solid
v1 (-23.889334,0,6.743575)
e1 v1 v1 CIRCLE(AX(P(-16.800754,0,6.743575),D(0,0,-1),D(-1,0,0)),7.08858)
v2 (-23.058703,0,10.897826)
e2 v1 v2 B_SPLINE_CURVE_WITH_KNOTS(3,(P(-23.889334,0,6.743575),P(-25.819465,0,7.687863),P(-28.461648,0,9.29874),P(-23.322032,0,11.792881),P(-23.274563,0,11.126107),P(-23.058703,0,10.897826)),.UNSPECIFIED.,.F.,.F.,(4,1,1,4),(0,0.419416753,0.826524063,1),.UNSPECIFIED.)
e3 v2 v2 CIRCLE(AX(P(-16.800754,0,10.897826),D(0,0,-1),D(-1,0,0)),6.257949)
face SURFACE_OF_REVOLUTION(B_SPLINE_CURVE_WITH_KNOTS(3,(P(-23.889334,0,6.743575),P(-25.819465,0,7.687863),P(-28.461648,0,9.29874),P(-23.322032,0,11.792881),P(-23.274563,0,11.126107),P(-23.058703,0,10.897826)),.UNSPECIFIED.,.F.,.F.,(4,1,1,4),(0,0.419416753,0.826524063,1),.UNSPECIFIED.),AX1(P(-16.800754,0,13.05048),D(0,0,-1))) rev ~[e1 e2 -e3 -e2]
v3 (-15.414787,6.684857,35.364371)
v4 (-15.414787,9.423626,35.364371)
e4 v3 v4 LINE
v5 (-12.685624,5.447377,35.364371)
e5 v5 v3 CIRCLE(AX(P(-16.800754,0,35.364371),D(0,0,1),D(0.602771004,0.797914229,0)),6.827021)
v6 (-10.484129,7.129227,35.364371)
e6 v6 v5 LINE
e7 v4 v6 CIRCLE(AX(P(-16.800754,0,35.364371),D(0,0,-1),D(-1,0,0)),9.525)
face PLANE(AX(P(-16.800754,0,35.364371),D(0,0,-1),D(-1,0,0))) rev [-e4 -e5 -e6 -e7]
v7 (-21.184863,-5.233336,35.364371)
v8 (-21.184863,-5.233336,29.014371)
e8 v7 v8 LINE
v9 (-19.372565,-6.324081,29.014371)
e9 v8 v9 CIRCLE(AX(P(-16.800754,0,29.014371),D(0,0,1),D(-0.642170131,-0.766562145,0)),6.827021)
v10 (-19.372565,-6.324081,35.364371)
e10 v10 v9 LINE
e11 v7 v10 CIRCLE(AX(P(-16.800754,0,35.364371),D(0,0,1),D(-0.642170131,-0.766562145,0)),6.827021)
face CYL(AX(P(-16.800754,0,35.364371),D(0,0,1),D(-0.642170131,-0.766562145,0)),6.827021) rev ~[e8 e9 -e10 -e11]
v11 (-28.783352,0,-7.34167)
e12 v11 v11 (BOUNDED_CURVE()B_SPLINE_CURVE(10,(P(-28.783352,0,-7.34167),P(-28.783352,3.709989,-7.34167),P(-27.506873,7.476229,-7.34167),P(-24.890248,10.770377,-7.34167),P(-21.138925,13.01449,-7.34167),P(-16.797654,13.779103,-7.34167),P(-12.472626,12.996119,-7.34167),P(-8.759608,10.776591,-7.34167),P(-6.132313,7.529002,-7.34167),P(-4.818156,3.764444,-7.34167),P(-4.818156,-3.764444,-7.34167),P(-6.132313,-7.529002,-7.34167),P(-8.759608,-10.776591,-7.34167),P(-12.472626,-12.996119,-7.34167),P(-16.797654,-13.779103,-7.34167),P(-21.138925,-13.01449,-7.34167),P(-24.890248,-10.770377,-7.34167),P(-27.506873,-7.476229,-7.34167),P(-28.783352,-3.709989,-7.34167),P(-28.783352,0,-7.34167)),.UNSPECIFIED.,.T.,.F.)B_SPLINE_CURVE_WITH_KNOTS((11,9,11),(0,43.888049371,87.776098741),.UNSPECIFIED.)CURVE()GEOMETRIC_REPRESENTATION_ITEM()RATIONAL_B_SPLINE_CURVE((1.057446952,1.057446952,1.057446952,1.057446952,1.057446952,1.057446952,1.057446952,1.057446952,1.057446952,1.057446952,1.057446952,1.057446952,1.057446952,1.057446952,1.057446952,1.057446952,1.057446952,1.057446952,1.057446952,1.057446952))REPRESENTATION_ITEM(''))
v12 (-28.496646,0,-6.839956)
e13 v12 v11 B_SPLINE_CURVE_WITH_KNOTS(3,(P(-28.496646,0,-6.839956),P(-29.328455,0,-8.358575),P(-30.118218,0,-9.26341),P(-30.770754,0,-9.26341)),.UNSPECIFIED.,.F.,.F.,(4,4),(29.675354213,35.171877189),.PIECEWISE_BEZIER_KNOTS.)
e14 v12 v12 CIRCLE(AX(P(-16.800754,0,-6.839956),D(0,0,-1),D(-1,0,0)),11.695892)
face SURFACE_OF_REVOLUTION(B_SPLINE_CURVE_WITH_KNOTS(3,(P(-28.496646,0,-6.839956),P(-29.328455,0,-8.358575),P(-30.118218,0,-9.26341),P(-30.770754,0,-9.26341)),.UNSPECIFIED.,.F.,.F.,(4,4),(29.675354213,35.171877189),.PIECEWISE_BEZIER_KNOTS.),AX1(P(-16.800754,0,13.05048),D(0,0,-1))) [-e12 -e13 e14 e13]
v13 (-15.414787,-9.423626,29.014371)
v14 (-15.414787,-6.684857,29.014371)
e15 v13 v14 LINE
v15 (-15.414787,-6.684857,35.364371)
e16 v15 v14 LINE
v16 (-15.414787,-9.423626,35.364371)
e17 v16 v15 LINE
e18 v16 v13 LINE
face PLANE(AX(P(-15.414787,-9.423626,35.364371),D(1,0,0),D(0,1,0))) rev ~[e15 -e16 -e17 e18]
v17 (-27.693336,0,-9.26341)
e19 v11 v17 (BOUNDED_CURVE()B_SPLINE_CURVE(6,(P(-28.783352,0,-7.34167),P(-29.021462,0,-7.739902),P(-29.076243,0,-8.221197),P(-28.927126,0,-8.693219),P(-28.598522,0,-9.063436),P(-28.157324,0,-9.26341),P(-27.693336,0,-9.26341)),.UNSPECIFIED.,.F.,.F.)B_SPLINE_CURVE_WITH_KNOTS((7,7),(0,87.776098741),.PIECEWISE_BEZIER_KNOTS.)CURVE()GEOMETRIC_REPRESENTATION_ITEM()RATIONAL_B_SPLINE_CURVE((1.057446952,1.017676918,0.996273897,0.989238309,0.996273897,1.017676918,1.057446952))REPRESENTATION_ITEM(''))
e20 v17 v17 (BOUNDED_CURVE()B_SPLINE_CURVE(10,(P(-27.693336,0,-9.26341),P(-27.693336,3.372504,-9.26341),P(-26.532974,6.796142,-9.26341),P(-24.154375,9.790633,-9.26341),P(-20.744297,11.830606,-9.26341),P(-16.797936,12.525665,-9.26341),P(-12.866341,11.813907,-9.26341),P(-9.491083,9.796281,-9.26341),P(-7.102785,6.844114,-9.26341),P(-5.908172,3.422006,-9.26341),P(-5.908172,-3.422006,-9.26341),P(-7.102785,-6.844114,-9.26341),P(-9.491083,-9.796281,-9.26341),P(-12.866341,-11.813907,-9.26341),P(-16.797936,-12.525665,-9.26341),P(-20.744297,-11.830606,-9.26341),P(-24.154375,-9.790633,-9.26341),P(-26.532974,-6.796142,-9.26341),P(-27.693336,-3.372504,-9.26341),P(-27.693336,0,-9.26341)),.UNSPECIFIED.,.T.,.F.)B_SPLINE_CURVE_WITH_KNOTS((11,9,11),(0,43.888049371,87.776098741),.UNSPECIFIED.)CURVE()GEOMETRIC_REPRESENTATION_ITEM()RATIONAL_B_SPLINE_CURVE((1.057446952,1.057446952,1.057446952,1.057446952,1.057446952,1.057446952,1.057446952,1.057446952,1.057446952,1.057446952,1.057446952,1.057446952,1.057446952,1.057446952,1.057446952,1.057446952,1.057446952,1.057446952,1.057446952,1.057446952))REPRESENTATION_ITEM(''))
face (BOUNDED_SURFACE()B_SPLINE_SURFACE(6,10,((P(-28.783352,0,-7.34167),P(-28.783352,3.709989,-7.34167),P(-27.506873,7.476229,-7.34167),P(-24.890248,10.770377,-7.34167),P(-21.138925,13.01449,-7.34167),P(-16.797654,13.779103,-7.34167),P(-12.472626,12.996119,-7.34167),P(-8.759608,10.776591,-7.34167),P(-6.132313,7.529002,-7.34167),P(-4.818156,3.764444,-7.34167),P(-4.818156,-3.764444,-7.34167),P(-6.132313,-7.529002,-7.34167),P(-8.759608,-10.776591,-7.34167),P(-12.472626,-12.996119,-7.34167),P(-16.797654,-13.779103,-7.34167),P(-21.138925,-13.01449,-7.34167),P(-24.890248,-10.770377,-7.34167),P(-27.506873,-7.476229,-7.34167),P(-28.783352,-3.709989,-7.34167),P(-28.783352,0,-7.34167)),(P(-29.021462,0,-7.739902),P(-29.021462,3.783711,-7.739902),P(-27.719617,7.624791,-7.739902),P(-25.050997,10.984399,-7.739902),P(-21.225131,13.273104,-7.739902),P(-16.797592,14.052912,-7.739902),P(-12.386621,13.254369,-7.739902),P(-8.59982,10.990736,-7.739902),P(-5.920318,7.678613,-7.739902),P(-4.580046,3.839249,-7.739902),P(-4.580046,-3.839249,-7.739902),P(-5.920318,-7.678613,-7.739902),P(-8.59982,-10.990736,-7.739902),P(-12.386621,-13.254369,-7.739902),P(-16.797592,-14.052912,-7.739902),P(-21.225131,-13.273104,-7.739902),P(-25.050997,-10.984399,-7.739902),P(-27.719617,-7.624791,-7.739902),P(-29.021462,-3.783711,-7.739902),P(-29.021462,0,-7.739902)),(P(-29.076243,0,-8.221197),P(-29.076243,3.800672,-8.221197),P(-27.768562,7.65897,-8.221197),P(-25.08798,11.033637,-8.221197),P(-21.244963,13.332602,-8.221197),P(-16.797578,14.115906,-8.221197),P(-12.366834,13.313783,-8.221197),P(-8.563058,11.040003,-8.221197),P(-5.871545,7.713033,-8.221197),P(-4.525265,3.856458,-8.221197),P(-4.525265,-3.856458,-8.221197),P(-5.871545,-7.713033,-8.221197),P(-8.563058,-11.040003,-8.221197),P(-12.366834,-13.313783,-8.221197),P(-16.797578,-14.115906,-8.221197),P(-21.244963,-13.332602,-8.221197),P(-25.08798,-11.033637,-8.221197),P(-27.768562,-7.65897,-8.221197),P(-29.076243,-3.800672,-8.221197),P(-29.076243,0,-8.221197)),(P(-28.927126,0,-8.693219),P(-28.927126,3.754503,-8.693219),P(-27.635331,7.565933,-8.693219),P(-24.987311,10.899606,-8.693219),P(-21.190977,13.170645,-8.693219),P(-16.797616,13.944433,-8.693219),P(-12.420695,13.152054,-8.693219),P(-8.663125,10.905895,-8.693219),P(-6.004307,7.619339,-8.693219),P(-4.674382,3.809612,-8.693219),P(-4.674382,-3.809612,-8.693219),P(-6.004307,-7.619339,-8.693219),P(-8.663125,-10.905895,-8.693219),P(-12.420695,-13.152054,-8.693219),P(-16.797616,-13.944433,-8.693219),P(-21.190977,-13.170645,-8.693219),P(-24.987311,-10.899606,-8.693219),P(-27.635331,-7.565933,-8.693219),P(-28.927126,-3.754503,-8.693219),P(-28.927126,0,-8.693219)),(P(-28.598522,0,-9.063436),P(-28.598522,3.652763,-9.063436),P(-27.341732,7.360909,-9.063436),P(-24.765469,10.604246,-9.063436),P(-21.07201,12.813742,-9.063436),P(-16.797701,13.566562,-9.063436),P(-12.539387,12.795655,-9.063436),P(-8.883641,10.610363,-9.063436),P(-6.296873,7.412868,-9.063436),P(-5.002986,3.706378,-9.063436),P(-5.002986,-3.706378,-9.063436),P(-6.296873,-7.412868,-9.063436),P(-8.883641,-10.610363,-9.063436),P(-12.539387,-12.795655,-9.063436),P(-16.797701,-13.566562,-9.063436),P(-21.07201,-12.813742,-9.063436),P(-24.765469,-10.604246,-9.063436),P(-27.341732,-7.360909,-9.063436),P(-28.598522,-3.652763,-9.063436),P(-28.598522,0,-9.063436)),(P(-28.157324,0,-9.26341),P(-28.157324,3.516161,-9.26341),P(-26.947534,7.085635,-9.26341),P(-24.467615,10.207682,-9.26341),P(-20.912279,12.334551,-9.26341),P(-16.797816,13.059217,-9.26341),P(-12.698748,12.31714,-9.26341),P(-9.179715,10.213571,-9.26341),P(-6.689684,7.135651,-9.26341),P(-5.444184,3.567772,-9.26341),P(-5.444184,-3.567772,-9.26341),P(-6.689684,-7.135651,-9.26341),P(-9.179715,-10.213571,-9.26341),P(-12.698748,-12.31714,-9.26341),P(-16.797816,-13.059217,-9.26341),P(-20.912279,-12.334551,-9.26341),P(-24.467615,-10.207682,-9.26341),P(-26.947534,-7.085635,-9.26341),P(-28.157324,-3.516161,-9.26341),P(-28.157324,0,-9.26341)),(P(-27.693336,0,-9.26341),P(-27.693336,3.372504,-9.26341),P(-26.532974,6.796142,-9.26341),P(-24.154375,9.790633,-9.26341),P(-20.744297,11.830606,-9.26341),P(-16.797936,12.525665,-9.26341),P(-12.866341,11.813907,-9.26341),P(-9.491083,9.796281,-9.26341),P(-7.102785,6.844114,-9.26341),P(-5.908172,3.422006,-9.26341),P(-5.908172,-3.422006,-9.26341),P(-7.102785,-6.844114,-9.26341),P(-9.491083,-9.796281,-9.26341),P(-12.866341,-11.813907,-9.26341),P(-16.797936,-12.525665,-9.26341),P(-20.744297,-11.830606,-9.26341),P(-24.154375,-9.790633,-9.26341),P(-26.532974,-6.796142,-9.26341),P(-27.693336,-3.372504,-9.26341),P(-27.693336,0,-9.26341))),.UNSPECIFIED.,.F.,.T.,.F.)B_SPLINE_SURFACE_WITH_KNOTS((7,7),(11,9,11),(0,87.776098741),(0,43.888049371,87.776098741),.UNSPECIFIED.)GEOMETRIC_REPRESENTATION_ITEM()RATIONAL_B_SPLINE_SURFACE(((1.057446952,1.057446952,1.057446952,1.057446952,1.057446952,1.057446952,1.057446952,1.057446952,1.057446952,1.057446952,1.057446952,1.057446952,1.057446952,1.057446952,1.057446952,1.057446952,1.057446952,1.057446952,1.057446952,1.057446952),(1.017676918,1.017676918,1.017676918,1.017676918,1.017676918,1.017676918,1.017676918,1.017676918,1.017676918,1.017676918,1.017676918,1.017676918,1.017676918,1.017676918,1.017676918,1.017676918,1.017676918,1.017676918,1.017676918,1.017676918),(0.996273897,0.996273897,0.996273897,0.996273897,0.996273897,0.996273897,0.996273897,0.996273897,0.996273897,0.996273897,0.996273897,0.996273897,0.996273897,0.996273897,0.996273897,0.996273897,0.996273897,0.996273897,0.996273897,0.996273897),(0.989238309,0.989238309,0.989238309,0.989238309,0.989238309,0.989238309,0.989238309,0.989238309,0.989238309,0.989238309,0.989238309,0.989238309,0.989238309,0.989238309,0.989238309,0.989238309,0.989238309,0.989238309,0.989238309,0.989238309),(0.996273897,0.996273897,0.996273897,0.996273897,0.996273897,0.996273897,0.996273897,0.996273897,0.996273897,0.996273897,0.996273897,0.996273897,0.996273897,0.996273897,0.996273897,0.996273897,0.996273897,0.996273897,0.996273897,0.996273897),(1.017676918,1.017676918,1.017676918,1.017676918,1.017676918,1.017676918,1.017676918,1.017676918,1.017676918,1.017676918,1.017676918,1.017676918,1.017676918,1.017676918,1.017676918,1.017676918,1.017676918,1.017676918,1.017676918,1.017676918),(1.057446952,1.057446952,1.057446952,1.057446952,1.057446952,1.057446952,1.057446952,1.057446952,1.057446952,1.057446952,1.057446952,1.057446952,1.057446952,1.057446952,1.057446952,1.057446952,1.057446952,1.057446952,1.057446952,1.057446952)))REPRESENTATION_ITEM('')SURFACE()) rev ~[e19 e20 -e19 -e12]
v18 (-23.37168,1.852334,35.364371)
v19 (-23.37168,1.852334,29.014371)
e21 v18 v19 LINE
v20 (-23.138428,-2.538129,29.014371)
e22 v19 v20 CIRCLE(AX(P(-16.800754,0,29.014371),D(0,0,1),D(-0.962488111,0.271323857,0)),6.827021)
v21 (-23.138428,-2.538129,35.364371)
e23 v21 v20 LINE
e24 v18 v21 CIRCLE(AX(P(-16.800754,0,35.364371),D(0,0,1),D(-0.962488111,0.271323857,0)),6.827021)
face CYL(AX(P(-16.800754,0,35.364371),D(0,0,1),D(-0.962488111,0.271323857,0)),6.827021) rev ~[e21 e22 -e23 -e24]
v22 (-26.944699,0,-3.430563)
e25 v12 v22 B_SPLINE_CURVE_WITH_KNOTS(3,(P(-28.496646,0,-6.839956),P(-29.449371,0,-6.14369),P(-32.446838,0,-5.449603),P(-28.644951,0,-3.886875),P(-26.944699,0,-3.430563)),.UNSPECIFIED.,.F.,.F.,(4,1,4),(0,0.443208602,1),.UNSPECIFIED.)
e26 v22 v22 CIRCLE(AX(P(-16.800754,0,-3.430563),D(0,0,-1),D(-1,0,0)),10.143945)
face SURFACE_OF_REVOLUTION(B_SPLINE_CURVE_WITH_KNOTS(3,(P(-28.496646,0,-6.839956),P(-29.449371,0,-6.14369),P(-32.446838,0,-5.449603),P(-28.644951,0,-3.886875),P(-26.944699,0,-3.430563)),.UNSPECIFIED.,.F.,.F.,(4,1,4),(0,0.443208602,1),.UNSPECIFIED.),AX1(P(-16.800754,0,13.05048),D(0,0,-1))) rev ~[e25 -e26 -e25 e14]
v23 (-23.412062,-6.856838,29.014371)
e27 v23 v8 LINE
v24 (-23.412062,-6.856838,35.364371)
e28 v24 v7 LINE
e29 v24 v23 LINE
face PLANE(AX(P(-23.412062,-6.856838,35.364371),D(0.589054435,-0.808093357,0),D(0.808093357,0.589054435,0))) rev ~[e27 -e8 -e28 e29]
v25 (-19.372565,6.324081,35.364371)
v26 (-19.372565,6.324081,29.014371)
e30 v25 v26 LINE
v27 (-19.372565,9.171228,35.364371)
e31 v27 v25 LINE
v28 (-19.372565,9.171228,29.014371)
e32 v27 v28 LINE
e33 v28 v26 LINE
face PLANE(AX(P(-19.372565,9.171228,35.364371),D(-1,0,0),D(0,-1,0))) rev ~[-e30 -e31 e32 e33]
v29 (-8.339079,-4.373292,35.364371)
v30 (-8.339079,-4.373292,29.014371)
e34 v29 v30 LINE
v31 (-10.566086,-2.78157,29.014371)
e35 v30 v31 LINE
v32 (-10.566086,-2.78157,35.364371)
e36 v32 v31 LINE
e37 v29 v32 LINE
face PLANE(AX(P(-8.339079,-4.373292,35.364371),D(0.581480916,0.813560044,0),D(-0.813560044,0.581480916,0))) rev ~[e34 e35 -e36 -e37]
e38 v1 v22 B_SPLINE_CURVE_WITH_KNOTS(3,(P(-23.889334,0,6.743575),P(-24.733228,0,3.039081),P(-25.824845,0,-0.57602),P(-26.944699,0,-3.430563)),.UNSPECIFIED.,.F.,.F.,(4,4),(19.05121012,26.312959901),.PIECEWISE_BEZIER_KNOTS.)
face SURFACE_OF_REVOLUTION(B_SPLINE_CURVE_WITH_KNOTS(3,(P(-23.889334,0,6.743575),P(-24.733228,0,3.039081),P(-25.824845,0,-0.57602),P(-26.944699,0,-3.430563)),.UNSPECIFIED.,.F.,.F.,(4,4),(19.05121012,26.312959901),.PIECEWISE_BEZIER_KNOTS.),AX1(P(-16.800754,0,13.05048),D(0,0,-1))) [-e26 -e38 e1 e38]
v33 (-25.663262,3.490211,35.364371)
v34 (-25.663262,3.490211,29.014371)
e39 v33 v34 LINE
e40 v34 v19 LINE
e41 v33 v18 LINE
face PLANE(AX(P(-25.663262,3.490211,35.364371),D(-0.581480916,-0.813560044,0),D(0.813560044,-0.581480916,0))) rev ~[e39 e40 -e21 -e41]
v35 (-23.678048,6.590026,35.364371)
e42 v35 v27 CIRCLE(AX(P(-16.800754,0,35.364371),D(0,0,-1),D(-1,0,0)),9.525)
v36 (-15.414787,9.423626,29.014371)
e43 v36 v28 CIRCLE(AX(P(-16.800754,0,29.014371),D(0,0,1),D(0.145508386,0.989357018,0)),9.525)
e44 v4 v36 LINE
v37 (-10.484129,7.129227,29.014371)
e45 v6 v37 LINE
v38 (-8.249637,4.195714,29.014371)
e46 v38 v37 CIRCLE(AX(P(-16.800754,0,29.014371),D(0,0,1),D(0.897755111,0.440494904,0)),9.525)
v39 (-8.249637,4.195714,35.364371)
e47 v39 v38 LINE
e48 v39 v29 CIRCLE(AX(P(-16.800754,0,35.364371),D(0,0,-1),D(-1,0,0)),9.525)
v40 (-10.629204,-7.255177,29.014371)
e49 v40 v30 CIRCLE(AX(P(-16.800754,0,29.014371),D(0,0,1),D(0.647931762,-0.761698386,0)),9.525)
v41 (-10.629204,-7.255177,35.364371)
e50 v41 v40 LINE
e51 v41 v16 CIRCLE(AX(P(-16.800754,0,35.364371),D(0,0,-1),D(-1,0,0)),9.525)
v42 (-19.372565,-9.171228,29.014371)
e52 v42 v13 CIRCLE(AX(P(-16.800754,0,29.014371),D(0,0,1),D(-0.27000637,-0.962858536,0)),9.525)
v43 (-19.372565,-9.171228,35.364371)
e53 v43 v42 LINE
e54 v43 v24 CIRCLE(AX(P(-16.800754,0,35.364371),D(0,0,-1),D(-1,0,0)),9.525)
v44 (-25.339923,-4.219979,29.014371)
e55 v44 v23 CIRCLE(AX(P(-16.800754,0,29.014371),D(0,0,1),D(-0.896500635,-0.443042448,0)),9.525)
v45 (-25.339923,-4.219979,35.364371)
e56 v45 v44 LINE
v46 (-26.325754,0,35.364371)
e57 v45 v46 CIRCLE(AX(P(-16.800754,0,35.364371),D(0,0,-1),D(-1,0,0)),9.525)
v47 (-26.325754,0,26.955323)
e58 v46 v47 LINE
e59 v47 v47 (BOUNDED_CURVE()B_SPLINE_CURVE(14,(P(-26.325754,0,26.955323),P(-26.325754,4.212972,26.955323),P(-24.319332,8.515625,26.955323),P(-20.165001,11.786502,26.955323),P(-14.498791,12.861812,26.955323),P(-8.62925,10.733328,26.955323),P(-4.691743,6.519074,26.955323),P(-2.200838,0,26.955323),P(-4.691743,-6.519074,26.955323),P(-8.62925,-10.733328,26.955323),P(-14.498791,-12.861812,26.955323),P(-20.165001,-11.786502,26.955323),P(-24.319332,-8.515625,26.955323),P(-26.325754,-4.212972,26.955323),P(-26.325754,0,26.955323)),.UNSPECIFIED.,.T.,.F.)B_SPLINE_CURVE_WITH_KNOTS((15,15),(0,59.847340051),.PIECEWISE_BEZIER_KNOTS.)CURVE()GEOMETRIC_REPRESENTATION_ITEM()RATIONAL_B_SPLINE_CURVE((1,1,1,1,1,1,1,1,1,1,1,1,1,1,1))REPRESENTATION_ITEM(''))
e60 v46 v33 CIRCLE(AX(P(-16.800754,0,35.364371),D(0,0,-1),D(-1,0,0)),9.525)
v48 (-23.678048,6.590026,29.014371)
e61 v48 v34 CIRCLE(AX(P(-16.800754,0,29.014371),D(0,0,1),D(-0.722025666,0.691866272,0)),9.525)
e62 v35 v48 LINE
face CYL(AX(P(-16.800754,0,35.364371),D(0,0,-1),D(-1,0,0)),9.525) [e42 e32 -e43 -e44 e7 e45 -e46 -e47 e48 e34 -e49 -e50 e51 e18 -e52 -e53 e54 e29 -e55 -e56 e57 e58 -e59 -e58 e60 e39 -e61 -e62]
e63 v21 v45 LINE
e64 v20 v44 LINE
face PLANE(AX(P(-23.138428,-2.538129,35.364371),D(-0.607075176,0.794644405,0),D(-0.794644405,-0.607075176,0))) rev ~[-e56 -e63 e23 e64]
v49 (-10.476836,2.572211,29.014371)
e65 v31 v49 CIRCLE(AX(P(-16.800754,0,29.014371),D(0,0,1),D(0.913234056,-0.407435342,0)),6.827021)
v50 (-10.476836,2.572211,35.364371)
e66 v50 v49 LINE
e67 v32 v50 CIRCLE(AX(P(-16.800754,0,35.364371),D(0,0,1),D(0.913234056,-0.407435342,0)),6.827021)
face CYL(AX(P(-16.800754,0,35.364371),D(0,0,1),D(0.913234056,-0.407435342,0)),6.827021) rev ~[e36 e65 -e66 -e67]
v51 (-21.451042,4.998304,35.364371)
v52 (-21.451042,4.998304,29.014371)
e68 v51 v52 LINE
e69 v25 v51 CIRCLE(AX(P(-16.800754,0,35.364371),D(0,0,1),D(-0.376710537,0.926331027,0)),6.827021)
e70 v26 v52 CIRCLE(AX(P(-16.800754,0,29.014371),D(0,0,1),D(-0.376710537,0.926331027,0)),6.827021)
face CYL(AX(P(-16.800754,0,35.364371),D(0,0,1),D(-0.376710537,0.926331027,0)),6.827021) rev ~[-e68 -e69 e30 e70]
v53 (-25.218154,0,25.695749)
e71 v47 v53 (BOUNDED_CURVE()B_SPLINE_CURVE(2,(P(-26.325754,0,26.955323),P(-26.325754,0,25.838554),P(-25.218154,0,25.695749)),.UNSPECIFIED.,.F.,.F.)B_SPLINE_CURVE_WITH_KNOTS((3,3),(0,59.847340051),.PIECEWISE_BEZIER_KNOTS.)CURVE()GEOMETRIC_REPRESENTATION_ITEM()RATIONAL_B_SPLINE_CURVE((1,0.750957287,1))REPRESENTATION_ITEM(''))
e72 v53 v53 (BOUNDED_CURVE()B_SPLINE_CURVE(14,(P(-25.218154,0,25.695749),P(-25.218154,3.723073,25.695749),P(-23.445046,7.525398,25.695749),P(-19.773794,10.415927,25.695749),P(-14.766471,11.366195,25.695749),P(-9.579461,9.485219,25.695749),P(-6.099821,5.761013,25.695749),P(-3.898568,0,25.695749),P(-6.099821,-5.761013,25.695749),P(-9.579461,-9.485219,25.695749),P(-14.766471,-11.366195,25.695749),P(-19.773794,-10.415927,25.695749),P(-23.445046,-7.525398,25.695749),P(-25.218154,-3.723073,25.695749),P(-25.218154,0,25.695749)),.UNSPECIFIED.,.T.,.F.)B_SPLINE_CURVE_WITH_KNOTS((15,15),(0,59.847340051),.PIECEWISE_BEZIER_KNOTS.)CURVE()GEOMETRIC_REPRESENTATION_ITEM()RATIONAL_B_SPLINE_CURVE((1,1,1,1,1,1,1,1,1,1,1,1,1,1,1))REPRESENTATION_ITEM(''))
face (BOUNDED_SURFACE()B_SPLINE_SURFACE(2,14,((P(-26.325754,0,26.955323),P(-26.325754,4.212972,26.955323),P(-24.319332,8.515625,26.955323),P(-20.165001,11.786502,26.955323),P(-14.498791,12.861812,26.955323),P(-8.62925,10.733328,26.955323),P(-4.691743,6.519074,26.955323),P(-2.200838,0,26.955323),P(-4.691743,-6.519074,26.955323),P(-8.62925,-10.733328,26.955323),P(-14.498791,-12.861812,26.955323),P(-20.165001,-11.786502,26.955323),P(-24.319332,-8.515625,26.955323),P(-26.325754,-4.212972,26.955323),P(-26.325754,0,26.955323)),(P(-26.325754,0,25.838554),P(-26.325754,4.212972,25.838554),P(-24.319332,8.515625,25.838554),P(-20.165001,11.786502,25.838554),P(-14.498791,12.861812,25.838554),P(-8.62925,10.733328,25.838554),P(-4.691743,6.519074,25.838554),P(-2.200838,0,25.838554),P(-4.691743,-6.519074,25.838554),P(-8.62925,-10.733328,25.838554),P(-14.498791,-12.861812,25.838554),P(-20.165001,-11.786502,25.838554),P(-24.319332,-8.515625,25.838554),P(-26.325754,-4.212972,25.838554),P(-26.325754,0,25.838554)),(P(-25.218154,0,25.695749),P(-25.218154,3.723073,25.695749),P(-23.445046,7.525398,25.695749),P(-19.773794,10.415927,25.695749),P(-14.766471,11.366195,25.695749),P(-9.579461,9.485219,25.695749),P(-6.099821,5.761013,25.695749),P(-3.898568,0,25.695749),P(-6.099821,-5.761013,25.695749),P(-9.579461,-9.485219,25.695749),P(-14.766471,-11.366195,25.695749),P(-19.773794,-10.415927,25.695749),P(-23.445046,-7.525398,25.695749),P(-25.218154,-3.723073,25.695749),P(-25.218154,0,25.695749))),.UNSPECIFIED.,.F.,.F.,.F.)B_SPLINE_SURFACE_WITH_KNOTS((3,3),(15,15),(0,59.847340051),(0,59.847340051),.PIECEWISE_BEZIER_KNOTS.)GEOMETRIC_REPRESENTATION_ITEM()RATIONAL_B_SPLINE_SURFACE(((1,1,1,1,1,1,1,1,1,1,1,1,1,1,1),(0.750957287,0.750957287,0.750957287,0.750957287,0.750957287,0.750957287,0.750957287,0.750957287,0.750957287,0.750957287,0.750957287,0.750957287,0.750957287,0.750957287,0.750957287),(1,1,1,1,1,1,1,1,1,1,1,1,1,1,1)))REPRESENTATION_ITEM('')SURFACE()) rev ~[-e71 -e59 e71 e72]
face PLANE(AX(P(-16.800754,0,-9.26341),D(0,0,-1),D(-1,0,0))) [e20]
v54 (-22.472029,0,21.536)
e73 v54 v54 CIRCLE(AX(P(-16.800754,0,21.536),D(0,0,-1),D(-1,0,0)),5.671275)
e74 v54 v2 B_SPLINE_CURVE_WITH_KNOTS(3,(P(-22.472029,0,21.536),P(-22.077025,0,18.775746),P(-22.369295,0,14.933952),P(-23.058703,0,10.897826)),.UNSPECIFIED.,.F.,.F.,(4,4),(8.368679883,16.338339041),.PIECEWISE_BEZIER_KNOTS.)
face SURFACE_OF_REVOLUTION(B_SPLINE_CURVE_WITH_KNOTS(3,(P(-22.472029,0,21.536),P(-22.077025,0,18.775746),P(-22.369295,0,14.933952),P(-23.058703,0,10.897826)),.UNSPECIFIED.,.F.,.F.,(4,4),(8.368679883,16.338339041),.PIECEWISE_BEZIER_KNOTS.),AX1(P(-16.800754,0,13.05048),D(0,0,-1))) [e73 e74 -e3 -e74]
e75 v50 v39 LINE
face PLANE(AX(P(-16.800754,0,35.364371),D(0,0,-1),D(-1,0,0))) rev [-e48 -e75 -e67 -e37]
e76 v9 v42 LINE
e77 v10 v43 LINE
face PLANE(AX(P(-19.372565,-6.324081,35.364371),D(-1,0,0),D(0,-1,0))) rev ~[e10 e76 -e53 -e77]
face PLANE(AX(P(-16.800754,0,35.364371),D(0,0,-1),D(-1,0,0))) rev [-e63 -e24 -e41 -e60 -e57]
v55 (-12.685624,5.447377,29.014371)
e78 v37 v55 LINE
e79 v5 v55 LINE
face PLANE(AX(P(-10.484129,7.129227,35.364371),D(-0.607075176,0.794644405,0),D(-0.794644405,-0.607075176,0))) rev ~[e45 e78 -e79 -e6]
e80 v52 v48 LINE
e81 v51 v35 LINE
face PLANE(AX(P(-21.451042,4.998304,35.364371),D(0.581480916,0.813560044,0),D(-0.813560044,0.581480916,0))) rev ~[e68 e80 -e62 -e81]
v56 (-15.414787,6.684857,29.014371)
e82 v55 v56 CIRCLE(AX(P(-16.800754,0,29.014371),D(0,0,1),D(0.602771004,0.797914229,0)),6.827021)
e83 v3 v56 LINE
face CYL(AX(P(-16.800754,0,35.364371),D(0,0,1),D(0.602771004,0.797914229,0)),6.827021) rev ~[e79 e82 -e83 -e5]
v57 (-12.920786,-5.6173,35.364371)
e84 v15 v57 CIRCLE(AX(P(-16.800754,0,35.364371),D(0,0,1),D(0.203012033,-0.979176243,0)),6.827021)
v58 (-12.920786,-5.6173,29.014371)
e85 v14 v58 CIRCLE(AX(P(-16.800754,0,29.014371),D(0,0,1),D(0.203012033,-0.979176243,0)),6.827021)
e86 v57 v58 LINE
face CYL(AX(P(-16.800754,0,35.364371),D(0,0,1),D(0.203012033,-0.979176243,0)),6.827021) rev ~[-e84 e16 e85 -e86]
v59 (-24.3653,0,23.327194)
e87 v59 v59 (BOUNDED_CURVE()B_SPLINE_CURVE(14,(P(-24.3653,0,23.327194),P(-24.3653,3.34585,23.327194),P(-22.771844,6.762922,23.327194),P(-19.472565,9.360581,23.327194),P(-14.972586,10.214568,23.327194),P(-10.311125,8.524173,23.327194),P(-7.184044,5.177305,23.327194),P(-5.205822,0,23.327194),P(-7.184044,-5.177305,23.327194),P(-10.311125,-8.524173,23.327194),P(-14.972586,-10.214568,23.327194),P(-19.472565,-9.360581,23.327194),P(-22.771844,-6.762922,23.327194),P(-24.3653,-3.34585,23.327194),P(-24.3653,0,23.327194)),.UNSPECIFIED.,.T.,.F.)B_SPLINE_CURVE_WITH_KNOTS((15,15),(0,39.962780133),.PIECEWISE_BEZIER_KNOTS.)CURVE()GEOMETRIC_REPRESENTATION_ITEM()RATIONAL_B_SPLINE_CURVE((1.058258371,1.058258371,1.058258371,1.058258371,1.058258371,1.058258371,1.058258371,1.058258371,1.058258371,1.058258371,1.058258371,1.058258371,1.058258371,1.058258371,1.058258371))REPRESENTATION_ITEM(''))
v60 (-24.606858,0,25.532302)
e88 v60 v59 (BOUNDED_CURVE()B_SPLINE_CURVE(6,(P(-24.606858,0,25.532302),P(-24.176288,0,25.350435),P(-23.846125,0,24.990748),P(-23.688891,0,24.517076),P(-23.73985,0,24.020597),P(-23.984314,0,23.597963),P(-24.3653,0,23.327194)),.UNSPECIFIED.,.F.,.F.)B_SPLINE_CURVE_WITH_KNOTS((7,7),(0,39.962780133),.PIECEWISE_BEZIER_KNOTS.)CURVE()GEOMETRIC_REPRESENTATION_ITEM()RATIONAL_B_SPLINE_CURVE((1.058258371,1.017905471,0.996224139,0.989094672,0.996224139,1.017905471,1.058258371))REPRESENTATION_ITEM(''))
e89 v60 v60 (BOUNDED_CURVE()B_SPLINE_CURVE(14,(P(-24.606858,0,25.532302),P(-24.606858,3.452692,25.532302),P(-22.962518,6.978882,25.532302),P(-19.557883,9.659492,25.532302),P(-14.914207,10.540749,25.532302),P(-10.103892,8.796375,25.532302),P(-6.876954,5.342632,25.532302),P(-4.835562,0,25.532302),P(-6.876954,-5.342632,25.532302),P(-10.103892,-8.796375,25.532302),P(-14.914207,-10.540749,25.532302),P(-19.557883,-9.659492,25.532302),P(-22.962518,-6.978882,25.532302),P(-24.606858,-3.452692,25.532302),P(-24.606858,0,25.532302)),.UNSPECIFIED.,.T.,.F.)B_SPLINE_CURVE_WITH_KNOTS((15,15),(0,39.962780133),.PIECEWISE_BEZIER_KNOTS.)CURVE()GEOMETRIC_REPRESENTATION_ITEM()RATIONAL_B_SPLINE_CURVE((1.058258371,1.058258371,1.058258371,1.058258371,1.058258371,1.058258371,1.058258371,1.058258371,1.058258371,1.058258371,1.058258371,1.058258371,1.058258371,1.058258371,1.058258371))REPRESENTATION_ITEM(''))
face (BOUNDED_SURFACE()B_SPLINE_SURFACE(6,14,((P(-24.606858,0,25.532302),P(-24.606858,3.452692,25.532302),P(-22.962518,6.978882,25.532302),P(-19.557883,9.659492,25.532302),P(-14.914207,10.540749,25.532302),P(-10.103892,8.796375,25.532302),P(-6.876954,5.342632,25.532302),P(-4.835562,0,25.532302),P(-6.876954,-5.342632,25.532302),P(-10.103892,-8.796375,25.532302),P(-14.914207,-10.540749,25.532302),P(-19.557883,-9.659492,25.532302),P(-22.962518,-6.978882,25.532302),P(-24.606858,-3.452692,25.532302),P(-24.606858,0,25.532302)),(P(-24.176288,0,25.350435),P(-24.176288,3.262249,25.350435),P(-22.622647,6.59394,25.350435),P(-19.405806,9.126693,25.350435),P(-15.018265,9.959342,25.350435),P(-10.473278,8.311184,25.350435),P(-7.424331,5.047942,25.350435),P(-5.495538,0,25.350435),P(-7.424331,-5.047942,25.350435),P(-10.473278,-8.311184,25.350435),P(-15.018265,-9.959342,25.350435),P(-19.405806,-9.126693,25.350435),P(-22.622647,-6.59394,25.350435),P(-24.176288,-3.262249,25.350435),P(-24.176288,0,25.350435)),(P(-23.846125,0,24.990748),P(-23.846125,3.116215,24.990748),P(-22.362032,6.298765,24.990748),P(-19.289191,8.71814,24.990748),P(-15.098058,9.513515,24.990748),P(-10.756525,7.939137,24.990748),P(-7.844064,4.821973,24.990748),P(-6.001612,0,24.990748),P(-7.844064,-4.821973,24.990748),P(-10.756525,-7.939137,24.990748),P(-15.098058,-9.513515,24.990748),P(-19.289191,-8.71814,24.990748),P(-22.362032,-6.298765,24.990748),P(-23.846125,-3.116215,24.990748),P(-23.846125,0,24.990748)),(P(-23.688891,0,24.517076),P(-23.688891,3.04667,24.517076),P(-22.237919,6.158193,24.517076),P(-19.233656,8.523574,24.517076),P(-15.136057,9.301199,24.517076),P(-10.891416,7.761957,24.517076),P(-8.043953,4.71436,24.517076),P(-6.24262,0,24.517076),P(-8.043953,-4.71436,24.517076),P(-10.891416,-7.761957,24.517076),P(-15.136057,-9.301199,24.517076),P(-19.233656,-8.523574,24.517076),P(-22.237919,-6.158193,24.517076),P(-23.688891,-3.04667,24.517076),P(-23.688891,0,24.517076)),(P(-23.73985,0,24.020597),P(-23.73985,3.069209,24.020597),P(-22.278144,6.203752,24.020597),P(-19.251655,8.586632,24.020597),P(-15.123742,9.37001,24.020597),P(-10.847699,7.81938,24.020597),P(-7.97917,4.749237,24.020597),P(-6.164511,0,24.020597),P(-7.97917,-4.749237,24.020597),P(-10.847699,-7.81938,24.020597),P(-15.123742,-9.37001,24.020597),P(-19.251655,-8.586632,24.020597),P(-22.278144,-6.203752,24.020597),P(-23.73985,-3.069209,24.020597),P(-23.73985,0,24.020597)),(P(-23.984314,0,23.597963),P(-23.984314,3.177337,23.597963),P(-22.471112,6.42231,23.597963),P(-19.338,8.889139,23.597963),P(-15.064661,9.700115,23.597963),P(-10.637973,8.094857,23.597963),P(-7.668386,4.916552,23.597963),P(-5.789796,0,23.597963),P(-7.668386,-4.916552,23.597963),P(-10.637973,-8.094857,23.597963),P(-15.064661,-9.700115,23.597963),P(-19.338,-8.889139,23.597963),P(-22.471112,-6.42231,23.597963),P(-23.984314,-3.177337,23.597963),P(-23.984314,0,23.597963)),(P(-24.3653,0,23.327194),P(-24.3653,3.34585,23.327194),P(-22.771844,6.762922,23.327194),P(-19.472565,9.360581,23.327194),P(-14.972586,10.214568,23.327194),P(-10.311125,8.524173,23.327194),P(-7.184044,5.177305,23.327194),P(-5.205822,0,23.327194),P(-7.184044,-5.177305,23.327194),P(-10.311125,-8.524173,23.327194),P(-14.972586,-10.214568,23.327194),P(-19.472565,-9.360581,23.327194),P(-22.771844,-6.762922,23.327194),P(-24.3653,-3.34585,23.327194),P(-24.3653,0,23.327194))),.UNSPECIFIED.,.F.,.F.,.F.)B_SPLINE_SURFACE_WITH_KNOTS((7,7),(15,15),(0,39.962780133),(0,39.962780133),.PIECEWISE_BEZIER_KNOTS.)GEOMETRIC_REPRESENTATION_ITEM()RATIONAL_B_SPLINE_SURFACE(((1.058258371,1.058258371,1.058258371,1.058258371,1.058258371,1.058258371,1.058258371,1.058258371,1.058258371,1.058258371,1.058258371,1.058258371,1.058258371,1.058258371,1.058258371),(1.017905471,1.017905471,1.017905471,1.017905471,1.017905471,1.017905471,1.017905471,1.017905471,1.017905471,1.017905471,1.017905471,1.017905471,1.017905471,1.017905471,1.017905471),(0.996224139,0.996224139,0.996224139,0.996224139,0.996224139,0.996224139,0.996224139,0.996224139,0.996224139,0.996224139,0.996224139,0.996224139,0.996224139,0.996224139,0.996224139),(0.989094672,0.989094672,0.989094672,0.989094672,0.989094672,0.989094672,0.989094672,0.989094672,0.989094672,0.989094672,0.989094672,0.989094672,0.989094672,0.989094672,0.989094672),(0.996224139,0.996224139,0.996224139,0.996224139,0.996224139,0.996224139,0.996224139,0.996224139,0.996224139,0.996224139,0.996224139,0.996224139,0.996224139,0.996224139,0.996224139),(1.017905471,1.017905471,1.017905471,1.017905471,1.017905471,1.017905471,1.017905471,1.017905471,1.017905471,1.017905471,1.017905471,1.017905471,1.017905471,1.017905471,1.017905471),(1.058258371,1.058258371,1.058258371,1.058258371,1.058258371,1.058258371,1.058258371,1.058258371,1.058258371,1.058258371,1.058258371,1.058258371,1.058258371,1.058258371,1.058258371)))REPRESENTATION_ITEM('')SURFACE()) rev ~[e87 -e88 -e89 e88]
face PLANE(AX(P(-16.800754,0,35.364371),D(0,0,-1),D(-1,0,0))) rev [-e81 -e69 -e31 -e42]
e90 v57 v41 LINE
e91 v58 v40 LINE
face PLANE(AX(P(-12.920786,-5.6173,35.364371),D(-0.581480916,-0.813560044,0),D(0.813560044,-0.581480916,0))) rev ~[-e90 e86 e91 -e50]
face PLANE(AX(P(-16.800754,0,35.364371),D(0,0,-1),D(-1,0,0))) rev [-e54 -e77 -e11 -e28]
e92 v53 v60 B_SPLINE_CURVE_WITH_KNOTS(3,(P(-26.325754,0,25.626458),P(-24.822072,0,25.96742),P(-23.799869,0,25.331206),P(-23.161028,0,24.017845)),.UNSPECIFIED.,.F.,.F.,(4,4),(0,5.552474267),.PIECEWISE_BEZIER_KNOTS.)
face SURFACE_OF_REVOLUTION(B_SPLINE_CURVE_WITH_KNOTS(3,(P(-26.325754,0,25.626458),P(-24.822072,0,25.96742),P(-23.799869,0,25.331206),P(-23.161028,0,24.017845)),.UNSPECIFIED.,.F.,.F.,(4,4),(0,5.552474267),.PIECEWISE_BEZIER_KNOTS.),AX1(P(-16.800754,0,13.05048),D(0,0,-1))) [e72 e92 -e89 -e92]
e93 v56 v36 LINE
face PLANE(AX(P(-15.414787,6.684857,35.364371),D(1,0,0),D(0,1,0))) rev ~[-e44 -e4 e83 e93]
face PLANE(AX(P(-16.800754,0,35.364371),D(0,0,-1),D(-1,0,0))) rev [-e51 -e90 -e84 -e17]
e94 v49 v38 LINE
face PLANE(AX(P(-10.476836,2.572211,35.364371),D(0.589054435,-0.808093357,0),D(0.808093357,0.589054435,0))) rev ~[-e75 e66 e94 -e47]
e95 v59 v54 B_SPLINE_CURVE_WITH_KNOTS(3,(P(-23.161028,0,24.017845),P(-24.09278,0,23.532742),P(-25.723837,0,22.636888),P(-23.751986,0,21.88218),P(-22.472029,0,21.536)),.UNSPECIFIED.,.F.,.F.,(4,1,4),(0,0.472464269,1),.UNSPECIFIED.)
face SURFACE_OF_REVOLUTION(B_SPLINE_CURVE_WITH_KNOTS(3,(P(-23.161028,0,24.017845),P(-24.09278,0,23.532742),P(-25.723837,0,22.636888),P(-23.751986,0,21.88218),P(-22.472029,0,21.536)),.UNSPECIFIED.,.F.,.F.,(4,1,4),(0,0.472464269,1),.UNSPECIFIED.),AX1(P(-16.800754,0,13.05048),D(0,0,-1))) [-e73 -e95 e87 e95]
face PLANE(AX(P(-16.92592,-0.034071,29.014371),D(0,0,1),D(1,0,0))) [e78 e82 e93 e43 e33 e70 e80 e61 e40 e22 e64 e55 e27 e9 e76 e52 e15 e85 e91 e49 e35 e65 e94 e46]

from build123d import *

# Parameters (mm, degrees)
F2_R     = 1.27
F4_DEPTH = 6.35


with BuildPart() as f1:
    # F0 (on Front) → F1 (revolve)
    with BuildSketch(Plane.XZ):
        with BuildLine():
            add(Edge.make_bspline(
                [(-28.4966456652, -6.8399562779), (-29.3284551449, -8.3585751384), (-30.1182179448, -9.2634102158), (-30.770753986, -9.2634102158)],
                knots=[29.675354213, 29.675354213, 29.675354213, 29.675354213, 35.171877189, 35.171877189, 35.171877189, 35.171877189], degree=3))
            Line((-30.770753986, -9.2634102158), (-16.800753986, -9.2634102158))
            Line((-16.800753986, -9.2634102158), (-16.800753986, 35.3643707931))
            Line((-16.800753986, 35.3643707931), (-26.325753986, 35.3643707931))
            Line((-26.325753986, 35.3643707931), (-26.325753986, 25.6264582276))
            add(Edge.make_bspline(
                [(-26.325753986, 25.6264582276), (-24.8220720213, 25.9674204899), (-23.7998688188, 25.3312059181), (-23.1610279839, 24.0178447701)],
                knots=[0, 0, 0, 0, 5.552474267, 5.552474267, 5.552474267, 5.552474267], degree=3))
            add(Edge.make_bspline(
                [(-23.1610279839, 24.0178447701), (-22.8370089862, 23.3517102033), (-22.6116100093, 22.5113795883), (-22.4720291366, 21.535999924)],
                knots=[5.552474267, 5.552474267, 5.552474267, 5.552474267, 8.3686798828, 8.3686798828, 8.3686798828, 8.3686798828], degree=3))
            add(Edge.make_bspline(
                [(-22.4720291366, 21.535999924), (-22.0770253148, 18.7757456898), (-22.3692951404, 14.9339521497), (-23.0587029188, 10.8978256431)],
                knots=[8.3686798828, 8.3686798828, 8.3686798828, 8.3686798828, 16.3383390414, 16.3383390414, 16.3383390414, 16.3383390414], degree=3))
            add(Edge.make_bspline(
                [(-23.0587029188, 10.8978256431), (-23.2933772487, 9.5239286357), (-23.5740687806, 8.1275138626), (-23.8893337374, 6.7435752652)],
                knots=[16.3383390414, 16.3383390414, 16.3383390414, 16.3383390414, 19.0512101196, 19.0512101196, 19.0512101196, 19.0512101196], degree=3))
            add(Edge.make_bspline(
                [(-23.8893337374, 6.7435752652), (-24.7332275919, 3.0390808319), (-25.8248446305, -0.5760201452), (-26.9446993916, -3.4305627711)],
                knots=[19.0512101196, 19.0512101196, 19.0512101196, 19.0512101196, 26.312959901, 26.312959901, 26.312959901, 26.312959901], degree=3))
            add(Edge.make_bspline(
                [(-26.9446993916, -3.4305627711), (-27.4632236305, -4.752296262), (-27.9878018969, -5.9109698185), (-28.4966456652, -6.8399562779)],
                knots=[26.312959901, 26.312959901, 26.312959901, 26.312959901, 29.675354213, 29.675354213, 29.675354213, 29.675354213], degree=3))
        make_face()
        with BuildLine():
            add(Edge.make_bspline(
                [(-28.4966456652, -6.8399562779), (-29.4493708837, -6.1436897859), (-32.4468383476, -5.4496032834), (-28.6449505836, -3.8868749556), (-26.9446993916, -3.4305627711)],
                knots=[0, 0, 0, 0, 0.4432086015, 1, 1, 1, 1], degree=3))
            add(Edge.make_bspline(
                [(-26.9446993916, -3.4305627711), (-27.4632236305, -4.752296262), (-27.9878018969, -5.9109698185), (-28.4966456652, -6.8399562779)],
                knots=[26.312959901, 26.312959901, 26.312959901, 26.312959901, 29.675354213, 29.675354213, 29.675354213, 29.675354213], degree=3))
        make_face()
        with BuildLine():
            add(Edge.make_bspline(
                [(-23.8893337374, 6.7435752652), (-25.8194649176, 7.6878634155), (-28.4616478332, 9.2987396297), (-23.3220318401, 11.7928811589), (-23.2745634428, 11.1261067843), (-23.0587029188, 10.8978256431)],
                knots=[0, 0, 0, 0, 0.4194167532, 0.826524063, 1, 1, 1, 1], degree=3))
            add(Edge.make_bspline(
                [(-23.0587029188, 10.8978256431), (-23.2933772487, 9.5239286357), (-23.5740687806, 8.1275138626), (-23.8893337374, 6.7435752652)],
                knots=[16.3383390414, 16.3383390414, 16.3383390414, 16.3383390414, 19.0512101196, 19.0512101196, 19.0512101196, 19.0512101196], degree=3))
        make_face()
        with BuildLine():
            add(Edge.make_bspline(
                [(-23.1610279839, 24.0178447701), (-22.8370089862, 23.3517102033), (-22.6116100093, 22.5113795883), (-22.4720291366, 21.535999924)],
                knots=[5.552474267, 5.552474267, 5.552474267, 5.552474267, 8.3686798828, 8.3686798828, 8.3686798828, 8.3686798828], degree=3))
            add(Edge.make_bspline(
                [(-23.1610279839, 24.0178447701), (-24.0927796522, 23.5327420351), (-25.7238369486, 22.6368880839), (-23.7519857815, 21.8821803215), (-22.4720291366, 21.535999924)],
                knots=[0, 0, 0, 0, 0.4724642692, 1, 1, 1, 1], degree=3))
        make_face()
    revolve(axis=Axis((-16.800753986, 0, 13.0504802887), (0, 0, -1)))

    # F2
    f2_edges = [f1.edges().sort_by_distance(p)[0] for p in [
        (-2.830754, 0, -9.26341),
        (-7.275754, 0, 25.626458),
        (-10.44048, 0, 24.017845),
    ]]
    fillet(f2_edges, radius=F2_R)

    # F3 (on face) → F4 (cut)
    with BuildSketch(Plane.XY.offset(35.3643707931)):
        with BuildLine():
            ThreePointArc((-15.4147866141, 9.4236255997), (-17.4069571494, 9.5056900183), (-19.3725646564, 9.1712275555))
            Line((-19.3725646564, 9.1712275555), (-19.3725646564, 6.32408119))
            ThreePointArc((-19.3725646564, 6.32408119), (-20.472143023, 5.7557897426), (-21.4510415881, 4.9983035362))
            Line((-21.4510415881, 4.9983035362), (-23.6780484526, 6.5900262381))
            ThreePointArc((-23.6780484526, 6.5900262381), (-24.8218239255, 5.1369311874), (-25.6632623961, 3.4902105496))
            Line((-25.6632623961, 3.4902105496), (-23.3716803438, 1.8523336153))
            ThreePointArc((-23.3716803438, 1.8523336153), (-23.6181605612, -0.3621886379), (-23.1384280379, -2.5381293572))
            Line((-23.1384280379, -2.5381293572), (-25.3399225374, -4.2199793188))
            ThreePointArc((-25.3399225374, -4.2199793188), (-24.4898691375, -5.6216664065), (-23.4120620736, -6.8568382196))
            Line((-23.4120620736, -6.8568382196), (-21.1848628294, -5.2333357116))
            ThreePointArc((-21.1848628294, -5.2333357116), (-20.3212135434, -5.8493228263), (-19.3725646564, -6.32408119))
            Line((-19.3725646564, -6.32408119), (-19.3725646564, -9.1712275555))
            ThreePointArc((-19.3725646564, -9.1712275555), (-17.4069571494, -9.5056900183), (-15.4147866141, -9.4236255997))
            Line((-15.4147866141, -9.4236255997), (-15.4147866141, -6.6848565778))
            ThreePointArc((-15.4147866141, -6.6848565778), (-14.1142250097, -6.2762070617), (-12.9207860056, -5.6173001961))
            Line((-12.9207860056, -5.6173001961), (-10.6292039533, -7.2551771305))
            ThreePointArc((-10.6292039533, -7.2551771305), (-9.3436009035, -5.9259170517), (-8.3390792213, -4.3732922584))
            Line((-8.3390792213, -4.3732922584), (-10.5660860859, -2.7815695565))
            ThreePointArc((-10.5660860859, -2.7815695565), (-9.9746816223, -0.1137941453), (-10.4768357965, 2.5722114522))
            Line((-10.4768357965, 2.5722114522), (-8.2496365523, 4.1957139602))
            ThreePointArc((-8.2496365523, 4.1957139602), (-9.2235636356, 5.7716385364), (-10.4841293021, 7.129226999))
            Line((-10.4841293021, 7.129226999), (-12.6856238016, 5.4473770374))
            ThreePointArc((-12.6856238016, 5.4473770374), (-13.9814708353, 6.2177050057), (-15.4147866141, 6.6848565778))
            Line((-15.4147866141, 6.6848565778), (-15.4147866141, 9.4236255997))
        make_face()
    extrude(amount=-F4_DEPTH, mode=Mode.SUBTRACT)


solid = f1.part
